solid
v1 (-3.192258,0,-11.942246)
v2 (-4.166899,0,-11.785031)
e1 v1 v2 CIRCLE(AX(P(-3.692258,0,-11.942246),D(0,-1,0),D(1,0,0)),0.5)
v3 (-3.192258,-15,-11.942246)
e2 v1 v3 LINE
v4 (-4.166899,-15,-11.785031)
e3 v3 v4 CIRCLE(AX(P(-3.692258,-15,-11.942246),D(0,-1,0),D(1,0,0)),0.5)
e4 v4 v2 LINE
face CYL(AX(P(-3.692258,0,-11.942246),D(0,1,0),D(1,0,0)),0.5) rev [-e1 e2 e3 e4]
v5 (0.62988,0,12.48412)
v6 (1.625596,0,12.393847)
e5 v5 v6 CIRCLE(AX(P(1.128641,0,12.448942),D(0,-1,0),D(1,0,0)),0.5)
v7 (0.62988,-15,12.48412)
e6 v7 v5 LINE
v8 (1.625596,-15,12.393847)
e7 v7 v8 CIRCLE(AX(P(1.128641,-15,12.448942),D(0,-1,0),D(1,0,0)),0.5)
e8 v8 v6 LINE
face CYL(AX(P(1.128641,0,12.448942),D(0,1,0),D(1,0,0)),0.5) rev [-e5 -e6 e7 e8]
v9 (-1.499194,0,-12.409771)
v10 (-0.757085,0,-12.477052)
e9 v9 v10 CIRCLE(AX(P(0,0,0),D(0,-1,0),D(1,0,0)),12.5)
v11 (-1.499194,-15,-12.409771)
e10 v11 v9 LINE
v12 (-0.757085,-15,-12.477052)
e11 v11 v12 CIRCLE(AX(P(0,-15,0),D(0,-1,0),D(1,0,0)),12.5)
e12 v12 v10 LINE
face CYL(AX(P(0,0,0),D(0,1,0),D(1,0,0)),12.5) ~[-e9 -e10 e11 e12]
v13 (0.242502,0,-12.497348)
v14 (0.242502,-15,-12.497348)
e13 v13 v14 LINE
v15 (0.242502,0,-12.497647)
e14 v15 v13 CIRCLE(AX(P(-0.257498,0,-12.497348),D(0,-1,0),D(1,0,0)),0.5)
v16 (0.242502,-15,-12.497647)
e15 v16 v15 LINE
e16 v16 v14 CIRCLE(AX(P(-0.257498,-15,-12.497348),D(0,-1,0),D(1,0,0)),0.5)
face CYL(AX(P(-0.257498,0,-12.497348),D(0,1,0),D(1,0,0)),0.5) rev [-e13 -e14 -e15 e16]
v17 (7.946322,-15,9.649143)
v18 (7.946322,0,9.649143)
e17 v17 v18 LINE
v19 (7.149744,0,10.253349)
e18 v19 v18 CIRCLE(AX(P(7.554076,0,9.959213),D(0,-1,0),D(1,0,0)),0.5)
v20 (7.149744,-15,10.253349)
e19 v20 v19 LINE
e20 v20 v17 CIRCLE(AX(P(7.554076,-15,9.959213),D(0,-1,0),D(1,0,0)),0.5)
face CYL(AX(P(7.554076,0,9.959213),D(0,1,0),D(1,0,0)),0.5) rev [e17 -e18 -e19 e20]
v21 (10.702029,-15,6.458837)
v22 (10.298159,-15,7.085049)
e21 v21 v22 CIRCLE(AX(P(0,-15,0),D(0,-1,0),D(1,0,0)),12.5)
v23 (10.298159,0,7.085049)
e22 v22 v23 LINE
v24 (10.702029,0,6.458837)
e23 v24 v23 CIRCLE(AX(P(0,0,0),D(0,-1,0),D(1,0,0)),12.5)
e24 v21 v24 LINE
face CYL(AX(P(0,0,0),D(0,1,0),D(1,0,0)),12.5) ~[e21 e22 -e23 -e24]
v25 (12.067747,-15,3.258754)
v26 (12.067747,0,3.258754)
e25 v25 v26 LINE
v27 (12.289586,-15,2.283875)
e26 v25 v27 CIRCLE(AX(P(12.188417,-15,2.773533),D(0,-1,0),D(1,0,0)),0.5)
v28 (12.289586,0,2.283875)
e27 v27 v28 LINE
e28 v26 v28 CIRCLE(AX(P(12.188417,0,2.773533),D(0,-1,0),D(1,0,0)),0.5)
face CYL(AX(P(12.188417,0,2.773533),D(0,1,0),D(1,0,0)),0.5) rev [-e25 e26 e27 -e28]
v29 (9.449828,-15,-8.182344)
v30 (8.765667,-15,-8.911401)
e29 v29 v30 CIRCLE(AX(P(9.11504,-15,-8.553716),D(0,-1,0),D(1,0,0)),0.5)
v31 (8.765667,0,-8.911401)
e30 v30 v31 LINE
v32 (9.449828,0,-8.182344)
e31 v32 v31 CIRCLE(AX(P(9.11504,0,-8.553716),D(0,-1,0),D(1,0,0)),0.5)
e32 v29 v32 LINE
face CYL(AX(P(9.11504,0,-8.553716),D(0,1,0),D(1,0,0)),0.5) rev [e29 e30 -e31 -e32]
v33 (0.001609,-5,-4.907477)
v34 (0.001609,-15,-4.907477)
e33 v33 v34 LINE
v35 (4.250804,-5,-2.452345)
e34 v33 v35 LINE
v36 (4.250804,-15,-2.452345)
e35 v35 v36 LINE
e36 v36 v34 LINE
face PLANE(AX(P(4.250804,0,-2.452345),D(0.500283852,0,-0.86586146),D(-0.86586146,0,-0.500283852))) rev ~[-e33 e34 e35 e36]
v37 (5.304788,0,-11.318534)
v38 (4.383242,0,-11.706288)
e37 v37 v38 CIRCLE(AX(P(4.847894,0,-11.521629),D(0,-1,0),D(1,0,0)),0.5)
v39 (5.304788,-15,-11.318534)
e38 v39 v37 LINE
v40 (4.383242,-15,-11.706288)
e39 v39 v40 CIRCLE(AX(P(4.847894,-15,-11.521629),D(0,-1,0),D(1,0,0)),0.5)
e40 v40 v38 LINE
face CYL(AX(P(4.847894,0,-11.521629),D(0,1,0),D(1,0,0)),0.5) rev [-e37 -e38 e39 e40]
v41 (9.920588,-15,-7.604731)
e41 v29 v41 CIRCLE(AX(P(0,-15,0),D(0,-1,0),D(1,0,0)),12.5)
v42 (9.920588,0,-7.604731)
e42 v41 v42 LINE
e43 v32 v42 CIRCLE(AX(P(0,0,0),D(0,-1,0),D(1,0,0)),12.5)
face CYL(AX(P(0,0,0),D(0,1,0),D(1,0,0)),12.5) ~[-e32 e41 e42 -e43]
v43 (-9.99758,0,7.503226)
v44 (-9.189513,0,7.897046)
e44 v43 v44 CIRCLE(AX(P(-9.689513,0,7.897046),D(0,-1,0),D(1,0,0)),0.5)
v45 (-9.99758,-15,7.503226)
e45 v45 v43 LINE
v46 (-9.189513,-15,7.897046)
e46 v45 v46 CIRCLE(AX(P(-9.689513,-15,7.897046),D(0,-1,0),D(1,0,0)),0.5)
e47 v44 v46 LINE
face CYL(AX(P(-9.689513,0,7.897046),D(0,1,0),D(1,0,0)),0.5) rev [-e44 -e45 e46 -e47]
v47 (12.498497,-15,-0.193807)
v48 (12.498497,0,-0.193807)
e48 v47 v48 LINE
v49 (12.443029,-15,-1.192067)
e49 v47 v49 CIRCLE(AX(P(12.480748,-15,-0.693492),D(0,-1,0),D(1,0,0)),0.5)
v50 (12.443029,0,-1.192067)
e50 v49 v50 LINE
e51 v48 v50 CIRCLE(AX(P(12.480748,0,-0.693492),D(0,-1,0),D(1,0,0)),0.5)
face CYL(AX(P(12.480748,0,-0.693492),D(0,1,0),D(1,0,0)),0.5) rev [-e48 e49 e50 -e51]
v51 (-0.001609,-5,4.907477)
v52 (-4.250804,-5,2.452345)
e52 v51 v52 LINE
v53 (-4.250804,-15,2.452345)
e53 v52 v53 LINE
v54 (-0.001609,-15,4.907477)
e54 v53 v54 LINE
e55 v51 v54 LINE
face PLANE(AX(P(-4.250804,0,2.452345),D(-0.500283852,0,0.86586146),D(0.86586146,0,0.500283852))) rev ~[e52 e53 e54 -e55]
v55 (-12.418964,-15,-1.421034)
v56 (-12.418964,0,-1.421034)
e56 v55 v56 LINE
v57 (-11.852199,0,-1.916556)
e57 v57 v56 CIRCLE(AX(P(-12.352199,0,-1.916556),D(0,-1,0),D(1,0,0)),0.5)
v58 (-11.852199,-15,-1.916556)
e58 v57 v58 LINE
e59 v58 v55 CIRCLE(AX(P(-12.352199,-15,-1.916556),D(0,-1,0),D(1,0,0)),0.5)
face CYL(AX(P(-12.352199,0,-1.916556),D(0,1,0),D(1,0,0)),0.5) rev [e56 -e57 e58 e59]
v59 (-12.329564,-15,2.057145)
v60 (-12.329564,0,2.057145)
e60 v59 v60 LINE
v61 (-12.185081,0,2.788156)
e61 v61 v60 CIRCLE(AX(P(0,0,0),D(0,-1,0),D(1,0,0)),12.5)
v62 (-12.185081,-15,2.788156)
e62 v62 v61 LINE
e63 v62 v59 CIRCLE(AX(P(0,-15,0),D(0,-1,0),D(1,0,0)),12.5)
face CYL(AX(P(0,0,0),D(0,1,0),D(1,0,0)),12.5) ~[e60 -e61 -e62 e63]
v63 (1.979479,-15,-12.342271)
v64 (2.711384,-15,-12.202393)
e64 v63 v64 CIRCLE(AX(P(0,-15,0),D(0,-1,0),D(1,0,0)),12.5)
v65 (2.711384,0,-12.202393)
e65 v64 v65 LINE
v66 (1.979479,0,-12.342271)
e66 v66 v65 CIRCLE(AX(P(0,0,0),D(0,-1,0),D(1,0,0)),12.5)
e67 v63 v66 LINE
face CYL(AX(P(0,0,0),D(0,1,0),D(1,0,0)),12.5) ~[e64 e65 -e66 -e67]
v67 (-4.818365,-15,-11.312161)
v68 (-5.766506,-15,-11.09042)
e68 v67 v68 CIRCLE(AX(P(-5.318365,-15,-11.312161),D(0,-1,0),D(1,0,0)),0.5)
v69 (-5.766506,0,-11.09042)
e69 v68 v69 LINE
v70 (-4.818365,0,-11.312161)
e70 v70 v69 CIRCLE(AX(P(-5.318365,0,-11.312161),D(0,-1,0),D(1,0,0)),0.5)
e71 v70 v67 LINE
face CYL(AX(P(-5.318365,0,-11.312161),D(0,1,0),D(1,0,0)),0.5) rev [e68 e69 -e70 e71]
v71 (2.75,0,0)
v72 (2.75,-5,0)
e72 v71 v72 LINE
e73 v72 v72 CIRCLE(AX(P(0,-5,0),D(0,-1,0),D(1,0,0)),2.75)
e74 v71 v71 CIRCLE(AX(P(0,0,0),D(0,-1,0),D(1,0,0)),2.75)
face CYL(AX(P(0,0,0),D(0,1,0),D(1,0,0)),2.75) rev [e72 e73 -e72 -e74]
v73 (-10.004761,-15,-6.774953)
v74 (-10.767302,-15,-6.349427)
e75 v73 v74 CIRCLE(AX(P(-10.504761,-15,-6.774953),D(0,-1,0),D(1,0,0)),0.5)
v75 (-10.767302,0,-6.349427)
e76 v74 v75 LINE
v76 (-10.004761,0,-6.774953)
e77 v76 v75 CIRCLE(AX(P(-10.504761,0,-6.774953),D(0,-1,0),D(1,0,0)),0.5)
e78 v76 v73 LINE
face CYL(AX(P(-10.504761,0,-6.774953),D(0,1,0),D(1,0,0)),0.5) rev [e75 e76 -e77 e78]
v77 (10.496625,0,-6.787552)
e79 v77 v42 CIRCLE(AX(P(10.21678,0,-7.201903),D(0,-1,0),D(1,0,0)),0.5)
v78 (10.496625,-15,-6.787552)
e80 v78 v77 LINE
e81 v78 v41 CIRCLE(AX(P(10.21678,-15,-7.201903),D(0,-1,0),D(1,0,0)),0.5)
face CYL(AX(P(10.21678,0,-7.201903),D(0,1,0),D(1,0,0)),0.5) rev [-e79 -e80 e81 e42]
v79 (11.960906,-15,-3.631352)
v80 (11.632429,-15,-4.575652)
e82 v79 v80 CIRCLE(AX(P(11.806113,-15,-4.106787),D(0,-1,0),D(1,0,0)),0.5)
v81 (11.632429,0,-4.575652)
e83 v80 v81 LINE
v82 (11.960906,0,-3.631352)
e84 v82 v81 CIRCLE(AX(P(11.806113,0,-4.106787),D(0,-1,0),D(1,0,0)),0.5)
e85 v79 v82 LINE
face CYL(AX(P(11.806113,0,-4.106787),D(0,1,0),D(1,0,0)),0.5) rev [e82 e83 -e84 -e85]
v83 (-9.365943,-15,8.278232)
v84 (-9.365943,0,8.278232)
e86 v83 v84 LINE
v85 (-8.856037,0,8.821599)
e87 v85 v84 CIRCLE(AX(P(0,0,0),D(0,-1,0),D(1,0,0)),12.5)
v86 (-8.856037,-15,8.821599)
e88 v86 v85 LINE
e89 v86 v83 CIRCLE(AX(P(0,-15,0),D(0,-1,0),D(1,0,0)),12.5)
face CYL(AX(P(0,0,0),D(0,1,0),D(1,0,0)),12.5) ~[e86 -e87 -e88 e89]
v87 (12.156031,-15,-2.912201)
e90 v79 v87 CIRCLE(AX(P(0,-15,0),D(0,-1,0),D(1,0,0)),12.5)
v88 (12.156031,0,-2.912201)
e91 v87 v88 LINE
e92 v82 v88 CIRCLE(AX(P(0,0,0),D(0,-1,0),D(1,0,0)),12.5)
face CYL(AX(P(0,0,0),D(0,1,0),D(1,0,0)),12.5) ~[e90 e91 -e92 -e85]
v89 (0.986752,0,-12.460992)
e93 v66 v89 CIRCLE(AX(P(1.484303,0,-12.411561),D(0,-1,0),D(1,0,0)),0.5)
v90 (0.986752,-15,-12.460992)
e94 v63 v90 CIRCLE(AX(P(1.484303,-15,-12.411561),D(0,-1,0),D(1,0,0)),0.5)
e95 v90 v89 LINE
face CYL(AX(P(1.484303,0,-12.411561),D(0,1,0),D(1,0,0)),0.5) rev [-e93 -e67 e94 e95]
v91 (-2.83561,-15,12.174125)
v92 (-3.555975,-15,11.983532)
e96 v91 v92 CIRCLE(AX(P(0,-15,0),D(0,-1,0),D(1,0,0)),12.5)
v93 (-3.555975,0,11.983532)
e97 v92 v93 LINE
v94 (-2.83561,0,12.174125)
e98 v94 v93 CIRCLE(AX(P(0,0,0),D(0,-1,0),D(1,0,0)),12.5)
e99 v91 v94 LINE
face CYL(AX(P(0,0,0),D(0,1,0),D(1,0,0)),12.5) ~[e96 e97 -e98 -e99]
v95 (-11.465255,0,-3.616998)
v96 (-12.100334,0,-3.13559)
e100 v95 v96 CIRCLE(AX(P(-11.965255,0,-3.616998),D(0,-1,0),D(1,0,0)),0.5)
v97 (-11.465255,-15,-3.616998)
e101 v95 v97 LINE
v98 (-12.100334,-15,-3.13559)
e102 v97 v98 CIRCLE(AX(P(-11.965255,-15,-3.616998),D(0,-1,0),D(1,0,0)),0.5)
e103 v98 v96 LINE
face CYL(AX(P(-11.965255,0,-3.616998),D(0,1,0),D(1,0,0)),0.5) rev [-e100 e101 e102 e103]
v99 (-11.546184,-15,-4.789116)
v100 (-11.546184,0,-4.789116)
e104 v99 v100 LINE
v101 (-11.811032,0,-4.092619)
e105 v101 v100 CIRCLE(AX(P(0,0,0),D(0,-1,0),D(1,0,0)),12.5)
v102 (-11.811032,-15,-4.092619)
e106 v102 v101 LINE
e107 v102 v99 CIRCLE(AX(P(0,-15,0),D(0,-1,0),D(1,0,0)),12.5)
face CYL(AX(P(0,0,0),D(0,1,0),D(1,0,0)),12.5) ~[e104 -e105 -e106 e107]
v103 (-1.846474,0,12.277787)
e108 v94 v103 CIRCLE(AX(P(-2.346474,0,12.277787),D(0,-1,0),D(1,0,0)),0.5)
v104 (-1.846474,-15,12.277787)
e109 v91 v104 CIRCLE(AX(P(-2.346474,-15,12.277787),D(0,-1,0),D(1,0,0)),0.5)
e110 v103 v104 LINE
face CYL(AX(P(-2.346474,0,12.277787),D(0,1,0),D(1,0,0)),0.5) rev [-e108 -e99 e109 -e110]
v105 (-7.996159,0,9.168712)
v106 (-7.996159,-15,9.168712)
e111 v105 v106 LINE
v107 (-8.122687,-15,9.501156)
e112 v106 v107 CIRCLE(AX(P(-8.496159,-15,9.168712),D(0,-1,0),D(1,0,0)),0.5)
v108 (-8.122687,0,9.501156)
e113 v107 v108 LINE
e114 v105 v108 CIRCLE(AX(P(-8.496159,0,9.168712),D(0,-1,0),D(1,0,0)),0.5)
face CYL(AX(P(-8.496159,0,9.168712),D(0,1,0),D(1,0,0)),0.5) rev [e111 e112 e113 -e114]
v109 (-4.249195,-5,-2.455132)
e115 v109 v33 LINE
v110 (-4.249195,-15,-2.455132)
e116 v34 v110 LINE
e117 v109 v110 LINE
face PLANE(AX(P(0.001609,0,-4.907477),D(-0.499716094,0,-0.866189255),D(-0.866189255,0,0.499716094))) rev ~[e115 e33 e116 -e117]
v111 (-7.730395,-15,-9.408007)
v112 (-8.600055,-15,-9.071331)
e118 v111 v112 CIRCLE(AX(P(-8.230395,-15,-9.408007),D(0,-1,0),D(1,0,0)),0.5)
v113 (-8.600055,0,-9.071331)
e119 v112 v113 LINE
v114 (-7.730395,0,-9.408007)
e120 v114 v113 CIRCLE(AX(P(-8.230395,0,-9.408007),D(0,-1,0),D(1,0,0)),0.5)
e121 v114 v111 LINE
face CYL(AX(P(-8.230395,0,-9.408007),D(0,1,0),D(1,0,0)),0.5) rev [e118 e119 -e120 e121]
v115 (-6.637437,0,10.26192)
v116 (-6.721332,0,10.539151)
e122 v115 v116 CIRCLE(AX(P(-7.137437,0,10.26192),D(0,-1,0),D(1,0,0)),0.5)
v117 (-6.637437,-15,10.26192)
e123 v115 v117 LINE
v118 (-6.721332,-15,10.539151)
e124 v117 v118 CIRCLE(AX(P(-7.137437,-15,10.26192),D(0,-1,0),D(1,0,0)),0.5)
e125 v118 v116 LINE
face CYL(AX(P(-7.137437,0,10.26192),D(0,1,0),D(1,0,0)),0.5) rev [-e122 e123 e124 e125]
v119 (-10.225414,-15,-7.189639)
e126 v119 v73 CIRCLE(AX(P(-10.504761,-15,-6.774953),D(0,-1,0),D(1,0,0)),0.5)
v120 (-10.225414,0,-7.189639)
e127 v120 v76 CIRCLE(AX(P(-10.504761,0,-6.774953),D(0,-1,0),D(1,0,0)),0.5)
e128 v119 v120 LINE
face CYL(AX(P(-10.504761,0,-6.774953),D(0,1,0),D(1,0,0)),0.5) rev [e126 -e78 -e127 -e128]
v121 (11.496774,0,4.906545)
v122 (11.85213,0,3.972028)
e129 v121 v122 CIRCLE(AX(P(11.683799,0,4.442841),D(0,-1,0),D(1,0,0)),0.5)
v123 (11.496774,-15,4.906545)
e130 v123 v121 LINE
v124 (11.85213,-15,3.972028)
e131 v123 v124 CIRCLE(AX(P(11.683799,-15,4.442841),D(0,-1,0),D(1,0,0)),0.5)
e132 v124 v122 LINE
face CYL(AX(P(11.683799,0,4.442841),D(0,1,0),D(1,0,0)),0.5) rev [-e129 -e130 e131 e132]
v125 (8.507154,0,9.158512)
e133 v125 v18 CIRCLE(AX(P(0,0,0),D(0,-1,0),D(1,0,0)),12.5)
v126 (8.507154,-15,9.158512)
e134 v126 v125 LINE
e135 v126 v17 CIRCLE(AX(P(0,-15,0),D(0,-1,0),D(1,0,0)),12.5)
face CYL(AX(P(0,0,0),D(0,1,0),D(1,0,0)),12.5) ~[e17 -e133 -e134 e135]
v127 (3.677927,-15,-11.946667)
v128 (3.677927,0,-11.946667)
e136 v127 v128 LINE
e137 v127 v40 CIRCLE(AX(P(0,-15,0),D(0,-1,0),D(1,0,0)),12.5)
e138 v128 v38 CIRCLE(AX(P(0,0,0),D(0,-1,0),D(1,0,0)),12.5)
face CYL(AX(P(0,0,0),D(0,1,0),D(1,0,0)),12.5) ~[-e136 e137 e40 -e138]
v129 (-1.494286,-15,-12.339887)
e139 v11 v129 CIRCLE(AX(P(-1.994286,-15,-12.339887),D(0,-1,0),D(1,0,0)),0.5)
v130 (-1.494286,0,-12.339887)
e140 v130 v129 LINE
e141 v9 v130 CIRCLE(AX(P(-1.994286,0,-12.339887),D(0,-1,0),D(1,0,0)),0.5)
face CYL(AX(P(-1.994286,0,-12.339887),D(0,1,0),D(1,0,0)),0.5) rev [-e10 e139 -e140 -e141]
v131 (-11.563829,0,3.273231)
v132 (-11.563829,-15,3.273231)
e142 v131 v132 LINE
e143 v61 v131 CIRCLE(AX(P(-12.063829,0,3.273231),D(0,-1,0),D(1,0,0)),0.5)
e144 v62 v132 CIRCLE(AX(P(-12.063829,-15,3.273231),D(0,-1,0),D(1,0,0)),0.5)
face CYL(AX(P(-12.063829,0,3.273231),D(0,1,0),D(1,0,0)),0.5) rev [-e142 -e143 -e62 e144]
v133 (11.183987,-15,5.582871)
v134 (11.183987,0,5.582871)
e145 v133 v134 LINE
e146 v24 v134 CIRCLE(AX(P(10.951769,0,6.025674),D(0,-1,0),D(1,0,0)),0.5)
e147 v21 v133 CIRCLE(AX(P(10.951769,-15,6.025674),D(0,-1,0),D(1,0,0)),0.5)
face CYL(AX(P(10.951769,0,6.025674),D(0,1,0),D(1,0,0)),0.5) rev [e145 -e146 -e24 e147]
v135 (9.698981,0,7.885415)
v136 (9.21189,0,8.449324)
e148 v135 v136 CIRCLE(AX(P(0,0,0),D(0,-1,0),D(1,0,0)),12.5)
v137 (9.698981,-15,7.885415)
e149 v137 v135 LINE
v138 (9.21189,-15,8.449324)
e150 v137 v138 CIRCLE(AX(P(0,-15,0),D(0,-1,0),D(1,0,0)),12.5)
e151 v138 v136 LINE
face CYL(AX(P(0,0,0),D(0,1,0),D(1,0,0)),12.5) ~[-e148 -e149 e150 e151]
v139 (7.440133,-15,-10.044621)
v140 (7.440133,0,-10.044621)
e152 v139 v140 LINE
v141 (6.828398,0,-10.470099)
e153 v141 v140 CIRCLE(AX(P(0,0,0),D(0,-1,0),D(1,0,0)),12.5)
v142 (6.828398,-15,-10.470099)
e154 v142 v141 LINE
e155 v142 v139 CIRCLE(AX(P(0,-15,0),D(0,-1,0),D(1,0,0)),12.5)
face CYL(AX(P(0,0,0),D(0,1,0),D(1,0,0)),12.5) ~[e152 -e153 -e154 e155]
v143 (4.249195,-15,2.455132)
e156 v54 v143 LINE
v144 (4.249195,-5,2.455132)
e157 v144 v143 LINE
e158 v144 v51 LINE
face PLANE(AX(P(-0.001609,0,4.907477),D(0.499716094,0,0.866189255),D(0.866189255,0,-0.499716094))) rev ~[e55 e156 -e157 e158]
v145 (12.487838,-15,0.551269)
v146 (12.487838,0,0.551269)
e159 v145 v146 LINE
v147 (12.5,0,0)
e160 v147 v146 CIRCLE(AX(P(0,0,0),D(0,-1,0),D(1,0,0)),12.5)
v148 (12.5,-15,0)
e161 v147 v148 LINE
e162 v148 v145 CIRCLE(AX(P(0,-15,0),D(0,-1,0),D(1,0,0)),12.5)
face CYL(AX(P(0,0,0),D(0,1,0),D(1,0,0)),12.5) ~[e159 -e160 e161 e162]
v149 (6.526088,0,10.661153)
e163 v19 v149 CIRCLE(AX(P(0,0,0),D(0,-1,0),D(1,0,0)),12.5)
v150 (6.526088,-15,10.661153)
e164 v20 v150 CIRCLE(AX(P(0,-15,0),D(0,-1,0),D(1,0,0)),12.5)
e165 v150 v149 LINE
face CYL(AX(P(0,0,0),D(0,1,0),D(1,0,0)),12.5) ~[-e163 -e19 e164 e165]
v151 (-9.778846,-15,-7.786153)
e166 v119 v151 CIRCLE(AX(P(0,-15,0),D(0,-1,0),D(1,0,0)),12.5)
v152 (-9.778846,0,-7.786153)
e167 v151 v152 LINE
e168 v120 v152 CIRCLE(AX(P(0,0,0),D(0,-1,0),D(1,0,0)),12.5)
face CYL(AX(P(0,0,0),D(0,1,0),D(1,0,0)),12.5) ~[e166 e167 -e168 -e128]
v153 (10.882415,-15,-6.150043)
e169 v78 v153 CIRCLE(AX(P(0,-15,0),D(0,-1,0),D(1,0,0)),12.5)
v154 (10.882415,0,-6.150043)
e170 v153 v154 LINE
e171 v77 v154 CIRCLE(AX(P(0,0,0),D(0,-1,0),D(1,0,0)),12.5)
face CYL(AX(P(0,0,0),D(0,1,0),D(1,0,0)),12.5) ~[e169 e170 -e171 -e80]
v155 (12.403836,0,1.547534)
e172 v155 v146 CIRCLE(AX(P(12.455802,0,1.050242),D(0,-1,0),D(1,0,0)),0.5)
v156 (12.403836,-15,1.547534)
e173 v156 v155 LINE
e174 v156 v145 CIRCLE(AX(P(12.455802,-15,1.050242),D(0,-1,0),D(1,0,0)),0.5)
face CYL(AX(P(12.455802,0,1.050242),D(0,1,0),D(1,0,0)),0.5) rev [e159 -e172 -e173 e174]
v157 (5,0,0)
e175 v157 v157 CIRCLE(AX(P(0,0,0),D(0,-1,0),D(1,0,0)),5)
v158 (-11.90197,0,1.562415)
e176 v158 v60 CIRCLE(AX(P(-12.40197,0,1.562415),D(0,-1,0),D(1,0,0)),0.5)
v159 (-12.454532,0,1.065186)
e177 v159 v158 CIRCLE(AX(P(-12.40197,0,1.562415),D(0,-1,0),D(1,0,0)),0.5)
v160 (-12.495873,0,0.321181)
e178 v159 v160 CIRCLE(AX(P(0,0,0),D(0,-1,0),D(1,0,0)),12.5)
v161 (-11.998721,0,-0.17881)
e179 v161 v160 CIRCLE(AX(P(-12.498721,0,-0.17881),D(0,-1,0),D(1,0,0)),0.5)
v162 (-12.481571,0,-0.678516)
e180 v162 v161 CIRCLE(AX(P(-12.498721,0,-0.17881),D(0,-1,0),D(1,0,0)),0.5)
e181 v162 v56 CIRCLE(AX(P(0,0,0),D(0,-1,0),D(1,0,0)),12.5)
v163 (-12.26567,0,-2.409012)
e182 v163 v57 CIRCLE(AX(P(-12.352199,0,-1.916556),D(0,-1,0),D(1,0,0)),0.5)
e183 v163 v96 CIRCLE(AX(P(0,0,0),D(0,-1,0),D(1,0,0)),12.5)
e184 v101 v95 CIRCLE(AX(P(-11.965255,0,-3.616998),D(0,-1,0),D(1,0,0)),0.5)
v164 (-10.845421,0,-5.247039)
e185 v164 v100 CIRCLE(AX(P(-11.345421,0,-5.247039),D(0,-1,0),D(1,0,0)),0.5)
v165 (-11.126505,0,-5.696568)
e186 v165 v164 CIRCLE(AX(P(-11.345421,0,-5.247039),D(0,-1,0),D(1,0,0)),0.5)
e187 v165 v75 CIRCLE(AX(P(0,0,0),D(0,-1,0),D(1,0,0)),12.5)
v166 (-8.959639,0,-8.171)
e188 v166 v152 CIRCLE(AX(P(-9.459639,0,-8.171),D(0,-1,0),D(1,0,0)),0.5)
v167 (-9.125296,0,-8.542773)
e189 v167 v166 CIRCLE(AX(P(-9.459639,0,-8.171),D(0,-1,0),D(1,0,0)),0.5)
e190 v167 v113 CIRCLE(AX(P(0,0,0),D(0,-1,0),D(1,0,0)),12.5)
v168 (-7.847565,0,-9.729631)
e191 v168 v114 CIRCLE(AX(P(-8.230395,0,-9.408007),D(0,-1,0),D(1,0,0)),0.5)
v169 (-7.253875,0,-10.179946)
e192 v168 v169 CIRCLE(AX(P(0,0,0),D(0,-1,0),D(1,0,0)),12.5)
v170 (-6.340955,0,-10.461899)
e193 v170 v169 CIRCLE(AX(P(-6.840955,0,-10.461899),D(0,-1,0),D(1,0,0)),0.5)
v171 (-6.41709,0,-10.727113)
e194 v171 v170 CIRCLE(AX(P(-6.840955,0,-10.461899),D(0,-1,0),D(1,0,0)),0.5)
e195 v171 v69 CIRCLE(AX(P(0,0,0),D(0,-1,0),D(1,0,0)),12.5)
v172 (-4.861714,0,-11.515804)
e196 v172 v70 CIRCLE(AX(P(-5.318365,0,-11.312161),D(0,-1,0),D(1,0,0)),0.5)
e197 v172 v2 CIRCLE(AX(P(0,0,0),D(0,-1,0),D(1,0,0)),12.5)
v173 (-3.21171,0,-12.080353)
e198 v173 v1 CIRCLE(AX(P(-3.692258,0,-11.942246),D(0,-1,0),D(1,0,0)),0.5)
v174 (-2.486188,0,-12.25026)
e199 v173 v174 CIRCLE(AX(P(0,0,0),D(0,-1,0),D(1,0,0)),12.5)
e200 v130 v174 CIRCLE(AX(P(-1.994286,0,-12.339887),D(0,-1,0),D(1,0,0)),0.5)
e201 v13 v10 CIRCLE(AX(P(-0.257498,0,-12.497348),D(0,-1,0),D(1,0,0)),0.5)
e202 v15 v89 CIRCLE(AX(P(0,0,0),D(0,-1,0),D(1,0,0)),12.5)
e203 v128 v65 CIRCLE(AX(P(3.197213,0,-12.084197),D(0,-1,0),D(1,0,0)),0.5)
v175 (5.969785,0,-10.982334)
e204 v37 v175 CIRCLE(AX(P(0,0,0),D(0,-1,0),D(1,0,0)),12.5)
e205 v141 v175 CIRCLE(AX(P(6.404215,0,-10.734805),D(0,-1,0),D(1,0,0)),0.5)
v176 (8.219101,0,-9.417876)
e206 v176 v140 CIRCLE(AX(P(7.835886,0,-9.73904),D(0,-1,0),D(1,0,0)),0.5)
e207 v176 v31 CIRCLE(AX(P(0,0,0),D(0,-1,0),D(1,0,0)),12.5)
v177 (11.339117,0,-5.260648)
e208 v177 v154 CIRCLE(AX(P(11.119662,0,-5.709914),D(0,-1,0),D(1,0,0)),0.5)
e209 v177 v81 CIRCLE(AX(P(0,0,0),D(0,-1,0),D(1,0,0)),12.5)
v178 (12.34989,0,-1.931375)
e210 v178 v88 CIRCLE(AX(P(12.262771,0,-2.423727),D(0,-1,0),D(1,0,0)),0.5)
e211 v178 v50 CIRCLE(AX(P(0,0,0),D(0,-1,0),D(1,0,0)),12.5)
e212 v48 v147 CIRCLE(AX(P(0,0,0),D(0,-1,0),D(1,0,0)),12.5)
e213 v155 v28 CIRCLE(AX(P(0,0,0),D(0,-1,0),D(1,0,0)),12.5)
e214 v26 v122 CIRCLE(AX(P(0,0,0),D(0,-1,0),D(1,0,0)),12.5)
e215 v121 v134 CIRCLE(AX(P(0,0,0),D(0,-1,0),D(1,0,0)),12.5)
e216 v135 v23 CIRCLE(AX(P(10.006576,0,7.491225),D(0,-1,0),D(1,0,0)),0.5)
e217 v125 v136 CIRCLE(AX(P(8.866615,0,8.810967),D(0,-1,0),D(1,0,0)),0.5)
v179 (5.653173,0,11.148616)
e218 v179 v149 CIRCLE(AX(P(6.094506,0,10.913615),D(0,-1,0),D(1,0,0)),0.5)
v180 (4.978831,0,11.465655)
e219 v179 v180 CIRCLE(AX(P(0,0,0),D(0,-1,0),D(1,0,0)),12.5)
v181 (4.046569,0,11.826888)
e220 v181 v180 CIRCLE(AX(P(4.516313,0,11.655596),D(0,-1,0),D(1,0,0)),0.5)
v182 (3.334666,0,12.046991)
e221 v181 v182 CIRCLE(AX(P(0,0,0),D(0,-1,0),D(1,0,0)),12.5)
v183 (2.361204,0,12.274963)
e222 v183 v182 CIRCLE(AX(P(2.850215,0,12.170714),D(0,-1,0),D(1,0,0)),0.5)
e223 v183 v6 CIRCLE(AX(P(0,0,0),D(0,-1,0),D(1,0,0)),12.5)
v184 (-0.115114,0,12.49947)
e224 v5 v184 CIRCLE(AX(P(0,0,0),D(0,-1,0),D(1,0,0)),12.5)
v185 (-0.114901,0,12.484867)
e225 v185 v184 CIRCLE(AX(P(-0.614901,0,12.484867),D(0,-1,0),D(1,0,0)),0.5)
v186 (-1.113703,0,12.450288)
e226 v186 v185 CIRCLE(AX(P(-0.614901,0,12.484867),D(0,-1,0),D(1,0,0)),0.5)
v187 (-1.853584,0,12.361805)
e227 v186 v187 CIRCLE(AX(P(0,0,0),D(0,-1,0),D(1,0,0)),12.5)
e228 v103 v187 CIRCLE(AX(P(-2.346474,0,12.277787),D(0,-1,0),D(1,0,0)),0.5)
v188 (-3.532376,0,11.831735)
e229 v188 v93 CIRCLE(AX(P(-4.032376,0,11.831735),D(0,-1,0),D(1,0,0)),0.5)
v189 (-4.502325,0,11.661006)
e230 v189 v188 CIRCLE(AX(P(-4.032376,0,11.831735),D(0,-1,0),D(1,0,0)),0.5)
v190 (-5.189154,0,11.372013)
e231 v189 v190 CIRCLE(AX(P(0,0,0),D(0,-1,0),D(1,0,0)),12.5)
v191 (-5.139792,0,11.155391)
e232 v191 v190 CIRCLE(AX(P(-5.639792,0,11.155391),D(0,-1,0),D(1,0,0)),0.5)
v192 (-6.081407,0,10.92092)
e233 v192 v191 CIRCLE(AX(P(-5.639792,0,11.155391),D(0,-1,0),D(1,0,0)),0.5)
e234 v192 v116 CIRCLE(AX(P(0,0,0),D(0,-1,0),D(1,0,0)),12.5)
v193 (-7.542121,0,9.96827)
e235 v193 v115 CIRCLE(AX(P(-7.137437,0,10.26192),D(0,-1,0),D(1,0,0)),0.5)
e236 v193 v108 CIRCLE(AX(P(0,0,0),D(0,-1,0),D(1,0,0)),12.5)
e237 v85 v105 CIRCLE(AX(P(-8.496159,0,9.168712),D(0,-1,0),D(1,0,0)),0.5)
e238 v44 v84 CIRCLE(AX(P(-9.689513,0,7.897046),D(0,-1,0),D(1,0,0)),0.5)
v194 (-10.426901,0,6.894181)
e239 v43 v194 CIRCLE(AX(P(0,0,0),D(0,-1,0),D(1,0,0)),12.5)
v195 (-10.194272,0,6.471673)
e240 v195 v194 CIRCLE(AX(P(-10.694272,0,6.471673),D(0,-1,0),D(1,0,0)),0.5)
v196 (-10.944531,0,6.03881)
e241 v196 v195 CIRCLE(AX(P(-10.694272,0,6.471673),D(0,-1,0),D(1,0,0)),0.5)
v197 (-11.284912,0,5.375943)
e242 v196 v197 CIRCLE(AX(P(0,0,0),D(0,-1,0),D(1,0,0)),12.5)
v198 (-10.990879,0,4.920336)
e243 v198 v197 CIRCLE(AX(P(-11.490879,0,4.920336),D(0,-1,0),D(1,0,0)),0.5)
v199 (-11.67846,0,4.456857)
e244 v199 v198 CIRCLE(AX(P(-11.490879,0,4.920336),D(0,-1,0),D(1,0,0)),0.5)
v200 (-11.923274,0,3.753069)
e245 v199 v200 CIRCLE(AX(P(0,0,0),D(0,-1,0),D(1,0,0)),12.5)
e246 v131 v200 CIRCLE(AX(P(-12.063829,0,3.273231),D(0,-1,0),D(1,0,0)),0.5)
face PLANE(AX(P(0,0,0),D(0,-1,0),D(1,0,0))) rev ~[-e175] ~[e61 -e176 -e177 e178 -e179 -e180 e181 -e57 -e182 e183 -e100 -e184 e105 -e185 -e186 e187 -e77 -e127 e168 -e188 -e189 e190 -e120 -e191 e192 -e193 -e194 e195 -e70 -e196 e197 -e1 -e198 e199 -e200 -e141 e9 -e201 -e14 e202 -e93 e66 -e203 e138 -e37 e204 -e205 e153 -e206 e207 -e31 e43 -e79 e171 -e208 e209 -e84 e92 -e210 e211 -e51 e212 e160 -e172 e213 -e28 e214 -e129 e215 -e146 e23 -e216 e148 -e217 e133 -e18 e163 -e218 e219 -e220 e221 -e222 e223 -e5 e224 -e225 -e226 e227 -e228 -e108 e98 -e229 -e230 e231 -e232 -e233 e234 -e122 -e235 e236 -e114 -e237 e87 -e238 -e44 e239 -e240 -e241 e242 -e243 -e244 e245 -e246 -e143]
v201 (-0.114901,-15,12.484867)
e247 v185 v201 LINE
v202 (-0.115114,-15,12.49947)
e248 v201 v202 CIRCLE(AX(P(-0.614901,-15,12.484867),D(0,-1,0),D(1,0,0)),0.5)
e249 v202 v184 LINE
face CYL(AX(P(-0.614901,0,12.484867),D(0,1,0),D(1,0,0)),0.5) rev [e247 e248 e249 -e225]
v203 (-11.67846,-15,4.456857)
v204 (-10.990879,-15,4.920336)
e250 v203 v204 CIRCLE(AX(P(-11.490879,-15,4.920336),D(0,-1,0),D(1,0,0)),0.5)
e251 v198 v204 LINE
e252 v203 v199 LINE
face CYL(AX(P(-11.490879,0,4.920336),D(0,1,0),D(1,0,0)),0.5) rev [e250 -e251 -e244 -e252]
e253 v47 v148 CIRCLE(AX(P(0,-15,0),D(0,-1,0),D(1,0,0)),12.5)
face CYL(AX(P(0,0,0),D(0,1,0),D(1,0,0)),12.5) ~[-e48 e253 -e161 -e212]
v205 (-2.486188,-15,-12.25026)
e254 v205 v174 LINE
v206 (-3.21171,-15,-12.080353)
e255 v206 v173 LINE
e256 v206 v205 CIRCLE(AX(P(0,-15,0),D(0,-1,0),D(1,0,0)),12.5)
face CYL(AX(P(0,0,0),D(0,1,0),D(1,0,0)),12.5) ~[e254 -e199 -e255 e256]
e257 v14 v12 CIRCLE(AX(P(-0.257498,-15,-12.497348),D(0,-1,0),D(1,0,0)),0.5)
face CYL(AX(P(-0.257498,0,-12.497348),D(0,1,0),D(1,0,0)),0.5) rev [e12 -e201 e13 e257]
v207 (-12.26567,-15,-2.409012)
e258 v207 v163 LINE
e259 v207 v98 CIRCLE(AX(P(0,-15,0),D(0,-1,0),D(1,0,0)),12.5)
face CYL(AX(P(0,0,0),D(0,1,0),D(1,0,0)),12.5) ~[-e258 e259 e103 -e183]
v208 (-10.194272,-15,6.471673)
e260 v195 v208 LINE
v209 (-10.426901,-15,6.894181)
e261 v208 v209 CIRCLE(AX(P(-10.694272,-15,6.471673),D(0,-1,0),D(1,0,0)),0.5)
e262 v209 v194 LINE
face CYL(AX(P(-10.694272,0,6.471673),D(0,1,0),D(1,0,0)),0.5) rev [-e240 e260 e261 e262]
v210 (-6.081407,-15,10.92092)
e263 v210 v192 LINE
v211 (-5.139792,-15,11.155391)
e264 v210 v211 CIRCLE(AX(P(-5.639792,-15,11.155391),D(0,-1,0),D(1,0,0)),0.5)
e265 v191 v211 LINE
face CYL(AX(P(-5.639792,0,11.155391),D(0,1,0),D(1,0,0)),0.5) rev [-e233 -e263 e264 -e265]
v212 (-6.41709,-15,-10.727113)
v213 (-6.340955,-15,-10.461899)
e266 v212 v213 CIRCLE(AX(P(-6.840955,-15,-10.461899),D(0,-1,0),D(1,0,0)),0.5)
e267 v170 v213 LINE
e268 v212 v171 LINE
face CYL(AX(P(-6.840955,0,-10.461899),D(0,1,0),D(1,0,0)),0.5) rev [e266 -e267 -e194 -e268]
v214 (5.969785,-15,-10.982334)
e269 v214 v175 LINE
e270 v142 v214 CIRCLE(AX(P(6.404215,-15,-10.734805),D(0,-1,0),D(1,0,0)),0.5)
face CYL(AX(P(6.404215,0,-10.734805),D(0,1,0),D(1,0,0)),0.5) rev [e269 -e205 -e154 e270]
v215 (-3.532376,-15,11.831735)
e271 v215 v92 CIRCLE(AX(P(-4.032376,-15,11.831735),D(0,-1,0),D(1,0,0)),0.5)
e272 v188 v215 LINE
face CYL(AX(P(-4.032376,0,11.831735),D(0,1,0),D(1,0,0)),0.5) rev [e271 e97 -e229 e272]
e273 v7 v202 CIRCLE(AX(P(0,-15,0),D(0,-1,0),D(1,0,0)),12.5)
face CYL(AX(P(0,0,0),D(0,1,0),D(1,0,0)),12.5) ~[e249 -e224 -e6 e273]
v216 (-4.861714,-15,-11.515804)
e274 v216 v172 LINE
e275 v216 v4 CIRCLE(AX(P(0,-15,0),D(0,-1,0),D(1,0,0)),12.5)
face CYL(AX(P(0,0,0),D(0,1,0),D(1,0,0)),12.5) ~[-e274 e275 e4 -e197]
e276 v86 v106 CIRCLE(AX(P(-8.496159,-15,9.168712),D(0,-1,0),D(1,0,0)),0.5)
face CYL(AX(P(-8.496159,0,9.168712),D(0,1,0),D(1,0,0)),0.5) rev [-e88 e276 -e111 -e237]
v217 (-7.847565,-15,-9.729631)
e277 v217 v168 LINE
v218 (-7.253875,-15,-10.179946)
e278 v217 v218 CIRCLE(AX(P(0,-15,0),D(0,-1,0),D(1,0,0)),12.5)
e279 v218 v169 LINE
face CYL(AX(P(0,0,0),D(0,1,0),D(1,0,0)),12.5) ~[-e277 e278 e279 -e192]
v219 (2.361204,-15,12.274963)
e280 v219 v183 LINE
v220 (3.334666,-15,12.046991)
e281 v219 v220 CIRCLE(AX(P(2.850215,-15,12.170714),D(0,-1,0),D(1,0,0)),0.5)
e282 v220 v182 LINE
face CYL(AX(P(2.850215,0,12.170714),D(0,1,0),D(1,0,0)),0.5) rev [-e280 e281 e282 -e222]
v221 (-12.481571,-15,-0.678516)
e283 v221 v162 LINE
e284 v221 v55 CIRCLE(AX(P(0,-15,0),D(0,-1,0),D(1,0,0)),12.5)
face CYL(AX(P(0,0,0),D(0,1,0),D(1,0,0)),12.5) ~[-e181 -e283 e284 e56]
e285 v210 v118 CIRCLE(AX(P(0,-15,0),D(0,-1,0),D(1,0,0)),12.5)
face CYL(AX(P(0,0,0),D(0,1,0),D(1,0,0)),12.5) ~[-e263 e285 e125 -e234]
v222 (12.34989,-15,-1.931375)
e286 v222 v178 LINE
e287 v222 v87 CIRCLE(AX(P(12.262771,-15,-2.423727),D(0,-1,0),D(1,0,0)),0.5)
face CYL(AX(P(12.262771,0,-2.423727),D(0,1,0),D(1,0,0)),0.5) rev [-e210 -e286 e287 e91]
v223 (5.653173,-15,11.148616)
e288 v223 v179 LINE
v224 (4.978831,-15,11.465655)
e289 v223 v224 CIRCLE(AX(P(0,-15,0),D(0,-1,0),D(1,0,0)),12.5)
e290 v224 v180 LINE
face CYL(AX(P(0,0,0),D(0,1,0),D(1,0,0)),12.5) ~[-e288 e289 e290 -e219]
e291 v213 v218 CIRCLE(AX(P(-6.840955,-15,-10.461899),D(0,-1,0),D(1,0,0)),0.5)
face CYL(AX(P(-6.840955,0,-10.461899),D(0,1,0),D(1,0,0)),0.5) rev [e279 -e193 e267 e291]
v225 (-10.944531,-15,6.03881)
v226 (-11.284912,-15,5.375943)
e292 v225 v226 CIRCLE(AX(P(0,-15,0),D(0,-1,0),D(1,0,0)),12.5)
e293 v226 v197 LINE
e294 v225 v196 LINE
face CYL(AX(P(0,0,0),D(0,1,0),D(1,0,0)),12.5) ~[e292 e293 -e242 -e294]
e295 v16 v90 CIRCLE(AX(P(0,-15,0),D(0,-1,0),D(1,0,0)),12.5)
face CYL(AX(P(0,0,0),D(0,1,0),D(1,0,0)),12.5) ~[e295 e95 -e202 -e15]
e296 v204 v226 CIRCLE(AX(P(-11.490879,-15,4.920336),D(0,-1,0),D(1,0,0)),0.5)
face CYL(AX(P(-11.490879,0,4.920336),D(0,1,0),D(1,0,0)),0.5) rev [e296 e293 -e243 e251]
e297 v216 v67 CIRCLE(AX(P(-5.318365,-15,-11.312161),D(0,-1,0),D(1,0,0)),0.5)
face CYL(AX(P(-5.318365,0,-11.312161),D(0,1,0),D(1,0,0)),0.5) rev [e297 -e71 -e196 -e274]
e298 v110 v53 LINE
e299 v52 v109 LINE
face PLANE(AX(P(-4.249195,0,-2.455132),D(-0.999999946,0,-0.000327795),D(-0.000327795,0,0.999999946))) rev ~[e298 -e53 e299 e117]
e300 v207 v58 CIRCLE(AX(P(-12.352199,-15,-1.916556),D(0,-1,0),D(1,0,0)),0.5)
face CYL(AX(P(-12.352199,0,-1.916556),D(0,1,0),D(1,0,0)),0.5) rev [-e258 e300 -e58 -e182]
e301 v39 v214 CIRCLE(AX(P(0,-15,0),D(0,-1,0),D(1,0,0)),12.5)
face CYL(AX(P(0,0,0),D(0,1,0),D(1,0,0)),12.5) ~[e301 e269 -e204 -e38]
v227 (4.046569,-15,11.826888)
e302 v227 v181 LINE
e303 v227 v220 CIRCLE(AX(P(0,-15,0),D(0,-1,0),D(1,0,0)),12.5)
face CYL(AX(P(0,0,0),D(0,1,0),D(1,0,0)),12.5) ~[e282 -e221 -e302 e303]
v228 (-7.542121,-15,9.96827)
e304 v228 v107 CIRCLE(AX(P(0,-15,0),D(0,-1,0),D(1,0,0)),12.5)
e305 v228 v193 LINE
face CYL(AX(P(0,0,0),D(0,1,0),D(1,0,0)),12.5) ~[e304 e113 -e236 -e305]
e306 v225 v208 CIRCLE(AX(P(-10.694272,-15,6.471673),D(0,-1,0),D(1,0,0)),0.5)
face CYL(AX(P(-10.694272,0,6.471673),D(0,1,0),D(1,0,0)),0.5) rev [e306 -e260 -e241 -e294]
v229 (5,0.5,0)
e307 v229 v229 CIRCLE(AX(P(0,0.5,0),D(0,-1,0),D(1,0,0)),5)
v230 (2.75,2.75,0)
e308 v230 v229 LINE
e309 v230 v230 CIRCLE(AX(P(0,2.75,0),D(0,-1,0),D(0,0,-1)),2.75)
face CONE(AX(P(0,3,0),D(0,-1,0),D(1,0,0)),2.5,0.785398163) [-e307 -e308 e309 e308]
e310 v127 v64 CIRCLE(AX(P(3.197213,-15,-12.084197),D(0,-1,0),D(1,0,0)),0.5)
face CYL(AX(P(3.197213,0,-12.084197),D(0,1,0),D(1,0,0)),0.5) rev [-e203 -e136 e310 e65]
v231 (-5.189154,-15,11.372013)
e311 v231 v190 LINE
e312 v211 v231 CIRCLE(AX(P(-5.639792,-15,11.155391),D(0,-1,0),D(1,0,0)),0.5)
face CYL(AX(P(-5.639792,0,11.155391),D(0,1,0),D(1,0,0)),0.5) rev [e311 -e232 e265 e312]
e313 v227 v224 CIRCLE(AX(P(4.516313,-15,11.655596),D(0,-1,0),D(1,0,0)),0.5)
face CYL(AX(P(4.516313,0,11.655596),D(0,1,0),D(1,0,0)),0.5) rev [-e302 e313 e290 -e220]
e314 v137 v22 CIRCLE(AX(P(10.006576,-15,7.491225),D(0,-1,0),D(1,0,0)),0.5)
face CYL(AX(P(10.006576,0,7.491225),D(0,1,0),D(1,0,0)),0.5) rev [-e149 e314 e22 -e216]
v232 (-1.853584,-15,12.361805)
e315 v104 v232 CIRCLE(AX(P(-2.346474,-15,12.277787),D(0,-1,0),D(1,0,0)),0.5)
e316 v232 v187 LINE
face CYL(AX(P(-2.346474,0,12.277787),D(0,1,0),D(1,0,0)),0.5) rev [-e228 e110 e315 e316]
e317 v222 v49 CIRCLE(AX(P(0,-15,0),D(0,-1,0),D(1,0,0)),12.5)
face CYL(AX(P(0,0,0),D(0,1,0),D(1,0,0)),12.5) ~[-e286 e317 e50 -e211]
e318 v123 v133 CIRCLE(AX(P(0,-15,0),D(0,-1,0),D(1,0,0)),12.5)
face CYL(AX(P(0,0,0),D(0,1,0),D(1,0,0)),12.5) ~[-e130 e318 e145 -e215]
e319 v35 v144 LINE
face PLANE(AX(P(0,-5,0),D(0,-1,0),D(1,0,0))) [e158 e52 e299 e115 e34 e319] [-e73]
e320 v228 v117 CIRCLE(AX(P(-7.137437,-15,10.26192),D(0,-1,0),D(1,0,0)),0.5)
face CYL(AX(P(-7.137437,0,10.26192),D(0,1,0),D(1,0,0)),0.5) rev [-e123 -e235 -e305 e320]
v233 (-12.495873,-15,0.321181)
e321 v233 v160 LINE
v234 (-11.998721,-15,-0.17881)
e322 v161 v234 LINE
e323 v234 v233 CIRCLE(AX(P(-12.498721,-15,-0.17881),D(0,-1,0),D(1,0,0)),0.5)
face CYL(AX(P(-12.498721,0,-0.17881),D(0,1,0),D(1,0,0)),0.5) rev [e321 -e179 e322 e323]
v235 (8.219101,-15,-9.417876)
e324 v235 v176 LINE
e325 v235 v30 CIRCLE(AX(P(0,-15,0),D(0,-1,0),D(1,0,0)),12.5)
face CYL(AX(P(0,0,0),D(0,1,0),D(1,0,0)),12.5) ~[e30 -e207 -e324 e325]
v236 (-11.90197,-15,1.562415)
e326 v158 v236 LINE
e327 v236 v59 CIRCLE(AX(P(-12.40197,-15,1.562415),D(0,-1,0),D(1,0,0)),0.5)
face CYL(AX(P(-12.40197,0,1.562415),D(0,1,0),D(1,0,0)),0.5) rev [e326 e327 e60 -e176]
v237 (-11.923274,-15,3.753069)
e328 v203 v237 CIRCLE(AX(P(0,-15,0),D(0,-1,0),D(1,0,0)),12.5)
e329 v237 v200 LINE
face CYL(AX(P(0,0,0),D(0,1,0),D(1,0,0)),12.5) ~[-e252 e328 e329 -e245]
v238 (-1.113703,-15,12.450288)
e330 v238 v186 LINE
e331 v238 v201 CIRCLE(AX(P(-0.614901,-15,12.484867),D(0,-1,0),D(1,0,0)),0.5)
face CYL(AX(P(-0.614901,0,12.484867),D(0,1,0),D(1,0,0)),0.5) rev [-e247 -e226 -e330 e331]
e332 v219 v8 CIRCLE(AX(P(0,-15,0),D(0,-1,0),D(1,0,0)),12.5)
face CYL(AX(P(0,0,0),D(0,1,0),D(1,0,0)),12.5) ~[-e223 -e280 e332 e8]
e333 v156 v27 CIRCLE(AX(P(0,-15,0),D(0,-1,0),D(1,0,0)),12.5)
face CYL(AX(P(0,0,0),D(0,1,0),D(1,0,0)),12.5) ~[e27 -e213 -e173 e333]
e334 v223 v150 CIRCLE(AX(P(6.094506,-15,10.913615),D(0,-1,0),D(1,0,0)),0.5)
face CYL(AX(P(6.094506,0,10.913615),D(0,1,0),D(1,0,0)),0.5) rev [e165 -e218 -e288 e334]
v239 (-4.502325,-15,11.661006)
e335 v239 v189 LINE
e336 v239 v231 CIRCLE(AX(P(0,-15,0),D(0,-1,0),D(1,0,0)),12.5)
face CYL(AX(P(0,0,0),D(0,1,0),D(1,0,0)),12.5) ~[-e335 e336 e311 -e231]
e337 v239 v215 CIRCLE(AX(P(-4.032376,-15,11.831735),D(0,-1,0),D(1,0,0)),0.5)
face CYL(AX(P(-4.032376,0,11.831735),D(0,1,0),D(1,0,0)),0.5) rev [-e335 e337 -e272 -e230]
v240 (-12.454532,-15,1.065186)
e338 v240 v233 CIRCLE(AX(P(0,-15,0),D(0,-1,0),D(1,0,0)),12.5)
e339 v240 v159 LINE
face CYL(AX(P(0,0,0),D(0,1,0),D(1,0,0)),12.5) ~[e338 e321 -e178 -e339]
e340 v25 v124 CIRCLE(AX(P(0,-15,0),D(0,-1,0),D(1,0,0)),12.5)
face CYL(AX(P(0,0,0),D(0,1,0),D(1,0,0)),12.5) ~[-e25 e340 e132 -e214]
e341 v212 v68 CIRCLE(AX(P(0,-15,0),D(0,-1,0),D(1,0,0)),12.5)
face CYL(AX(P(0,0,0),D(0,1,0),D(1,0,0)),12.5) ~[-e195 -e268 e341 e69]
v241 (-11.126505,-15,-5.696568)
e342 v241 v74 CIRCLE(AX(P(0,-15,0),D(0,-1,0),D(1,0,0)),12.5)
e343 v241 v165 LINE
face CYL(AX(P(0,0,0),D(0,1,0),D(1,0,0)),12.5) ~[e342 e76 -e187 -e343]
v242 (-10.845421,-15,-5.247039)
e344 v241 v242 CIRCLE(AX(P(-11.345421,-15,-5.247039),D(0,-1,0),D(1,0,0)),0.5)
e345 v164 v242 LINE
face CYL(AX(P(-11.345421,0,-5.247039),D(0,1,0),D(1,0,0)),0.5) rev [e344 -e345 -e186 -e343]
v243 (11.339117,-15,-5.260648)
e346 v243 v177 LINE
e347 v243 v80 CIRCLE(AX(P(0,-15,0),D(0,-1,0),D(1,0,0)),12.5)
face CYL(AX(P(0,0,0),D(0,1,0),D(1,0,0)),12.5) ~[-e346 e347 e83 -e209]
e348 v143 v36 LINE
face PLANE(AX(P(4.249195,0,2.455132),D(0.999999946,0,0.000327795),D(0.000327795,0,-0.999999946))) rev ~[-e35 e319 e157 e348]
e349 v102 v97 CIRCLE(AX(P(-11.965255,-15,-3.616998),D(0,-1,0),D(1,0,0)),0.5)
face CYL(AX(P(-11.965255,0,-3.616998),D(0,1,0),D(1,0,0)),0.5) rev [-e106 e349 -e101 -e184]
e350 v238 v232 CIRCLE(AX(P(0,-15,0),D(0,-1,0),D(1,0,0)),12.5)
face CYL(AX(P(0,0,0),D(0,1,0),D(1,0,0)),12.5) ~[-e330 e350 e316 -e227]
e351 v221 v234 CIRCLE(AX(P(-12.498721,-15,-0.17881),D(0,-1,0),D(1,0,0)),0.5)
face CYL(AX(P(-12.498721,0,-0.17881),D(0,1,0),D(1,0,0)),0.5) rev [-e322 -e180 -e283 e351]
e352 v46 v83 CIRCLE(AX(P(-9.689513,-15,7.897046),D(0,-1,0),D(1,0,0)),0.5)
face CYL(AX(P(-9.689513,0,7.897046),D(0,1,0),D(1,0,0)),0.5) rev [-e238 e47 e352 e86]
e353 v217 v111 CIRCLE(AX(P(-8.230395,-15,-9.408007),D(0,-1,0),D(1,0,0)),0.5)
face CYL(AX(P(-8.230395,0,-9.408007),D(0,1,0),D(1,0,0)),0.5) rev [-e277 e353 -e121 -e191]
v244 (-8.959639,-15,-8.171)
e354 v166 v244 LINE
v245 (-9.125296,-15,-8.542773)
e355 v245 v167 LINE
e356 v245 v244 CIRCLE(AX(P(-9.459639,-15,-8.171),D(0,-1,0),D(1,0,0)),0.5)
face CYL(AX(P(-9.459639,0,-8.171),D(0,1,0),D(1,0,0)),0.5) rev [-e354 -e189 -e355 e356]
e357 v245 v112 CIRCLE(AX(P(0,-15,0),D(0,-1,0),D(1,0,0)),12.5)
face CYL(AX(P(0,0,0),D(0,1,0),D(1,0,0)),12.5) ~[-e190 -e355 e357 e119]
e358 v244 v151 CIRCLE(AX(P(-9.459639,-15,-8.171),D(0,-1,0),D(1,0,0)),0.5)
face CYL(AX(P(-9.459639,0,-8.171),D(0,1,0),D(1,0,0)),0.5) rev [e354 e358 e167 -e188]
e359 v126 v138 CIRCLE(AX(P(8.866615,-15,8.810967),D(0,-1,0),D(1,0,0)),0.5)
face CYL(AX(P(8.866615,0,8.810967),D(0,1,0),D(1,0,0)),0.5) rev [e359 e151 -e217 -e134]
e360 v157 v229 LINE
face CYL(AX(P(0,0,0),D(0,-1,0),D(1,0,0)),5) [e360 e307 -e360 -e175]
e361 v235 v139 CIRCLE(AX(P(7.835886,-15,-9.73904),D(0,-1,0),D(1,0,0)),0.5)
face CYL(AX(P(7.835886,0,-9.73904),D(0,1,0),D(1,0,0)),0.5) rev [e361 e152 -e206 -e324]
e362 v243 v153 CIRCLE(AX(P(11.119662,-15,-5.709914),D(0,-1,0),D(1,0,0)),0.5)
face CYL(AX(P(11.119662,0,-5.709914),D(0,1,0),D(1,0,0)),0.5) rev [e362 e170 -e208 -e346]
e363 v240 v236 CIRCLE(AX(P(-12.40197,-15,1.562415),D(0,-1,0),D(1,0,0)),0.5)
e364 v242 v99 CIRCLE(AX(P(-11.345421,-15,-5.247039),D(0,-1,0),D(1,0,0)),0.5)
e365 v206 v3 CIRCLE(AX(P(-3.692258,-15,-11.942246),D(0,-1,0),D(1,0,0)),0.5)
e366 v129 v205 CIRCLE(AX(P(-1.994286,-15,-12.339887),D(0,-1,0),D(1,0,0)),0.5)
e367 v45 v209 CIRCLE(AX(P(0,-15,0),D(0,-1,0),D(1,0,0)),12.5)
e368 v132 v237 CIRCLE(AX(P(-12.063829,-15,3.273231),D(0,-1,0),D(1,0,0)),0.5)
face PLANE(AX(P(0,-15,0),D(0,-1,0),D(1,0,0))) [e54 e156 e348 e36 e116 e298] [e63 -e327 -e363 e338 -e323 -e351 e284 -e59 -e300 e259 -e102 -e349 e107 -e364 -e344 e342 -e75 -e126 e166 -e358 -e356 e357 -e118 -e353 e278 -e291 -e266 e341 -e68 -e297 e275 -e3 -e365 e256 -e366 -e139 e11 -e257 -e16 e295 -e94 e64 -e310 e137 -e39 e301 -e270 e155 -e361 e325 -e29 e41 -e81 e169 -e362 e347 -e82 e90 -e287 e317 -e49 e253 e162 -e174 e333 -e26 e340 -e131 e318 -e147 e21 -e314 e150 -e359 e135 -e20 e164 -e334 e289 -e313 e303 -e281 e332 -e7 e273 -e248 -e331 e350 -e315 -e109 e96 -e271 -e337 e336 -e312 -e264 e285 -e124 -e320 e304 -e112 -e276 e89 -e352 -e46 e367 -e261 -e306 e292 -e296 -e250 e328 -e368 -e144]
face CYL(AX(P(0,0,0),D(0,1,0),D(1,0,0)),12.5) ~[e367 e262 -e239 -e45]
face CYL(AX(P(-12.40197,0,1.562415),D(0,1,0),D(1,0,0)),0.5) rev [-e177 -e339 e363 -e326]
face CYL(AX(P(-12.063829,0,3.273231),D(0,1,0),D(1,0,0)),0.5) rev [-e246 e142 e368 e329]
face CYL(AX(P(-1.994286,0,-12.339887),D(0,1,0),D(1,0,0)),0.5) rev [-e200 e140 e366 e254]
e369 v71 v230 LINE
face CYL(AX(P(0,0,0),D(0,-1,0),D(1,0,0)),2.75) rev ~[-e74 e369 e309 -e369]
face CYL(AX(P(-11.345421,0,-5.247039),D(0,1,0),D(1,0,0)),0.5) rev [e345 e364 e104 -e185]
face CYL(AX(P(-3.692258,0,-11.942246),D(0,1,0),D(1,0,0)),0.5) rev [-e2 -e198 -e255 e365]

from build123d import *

# Parameters (mm, degrees)
F0_R     = 12.5
F0_R_2   = 5
F1_DEPTH = 15
F2_DEPTH = 15
F0_R_3   = 2.75
F3_DEPTH = 5
F4_DEPTH = 3
F5_DEPTH = 3
F7_R     = 0.5
F8_DEPTH = 15


# Not quite as in the source:
# - a fillet or chamfer that OpenCascade refuses, or shapes differently, is made with other operations: its cross-section is extruded or revolved along the edge and cut away or added


with BuildPart() as f1:
    # F0 (on Front) → F1 (new body)
    with BuildSketch(Plane.XZ):
        Circle(F0_R)
        Circle(F0_R_2, mode=Mode.SUBTRACT)
    extrude(amount=F1_DEPTH)

    # F0 (on Front) → F2 (join)
    with BuildSketch(Plane.XZ):
        Circle(F0_R_2)
        Polygon((-4.2491954474, -2.4551316428), (-4.250804096, 2.4523453817), (-0.0016086486, 4.9074770245), (4.2491954474, 2.4551316428), (4.250804096, -2.4523453817), (0.0016086486, -4.9074770245), align=None, mode=Mode.SUBTRACT)
    extrude(amount=F2_DEPTH)

    # F0 (on Front) → F3 (join)
    with BuildSketch(Plane.XZ):
        Polygon((-0.0016086486, 4.9074770245), (-4.250804096, 2.4523453817), (-4.2491954474, -2.4551316428), (0.0016086486, -4.9074770245), (4.250804096, -2.4523453817), (4.2491954474, 2.4551316428), align=None)
        Circle(F0_R_3, mode=Mode.SUBTRACT)
    extrude(amount=F3_DEPTH)

    # F0 (on Front) → F4 (join)
    with BuildSketch(Plane.XZ):
        Circle(F0_R_2)
        Polygon((-4.2491954474, -2.4551316428), (-4.250804096, 2.4523453817), (-0.0016086486, 4.9074770245), (4.2491954474, 2.4551316428), (4.250804096, -2.4523453817), (0.0016086486, -4.9074770245), align=None, mode=Mode.SUBTRACT)
    extrude(amount=-F4_DEPTH)

    # F0 (on Front) → F5 (join)
    with BuildSketch(Plane.XZ):
        Polygon((-0.0016086486, 4.9074770245), (-4.250804096, 2.4523453817), (-4.2491954474, -2.4551316428), (0.0016086486, -4.9074770245), (4.250804096, -2.4523453817), (4.2491954474, 2.4551316428), align=None)
        Circle(F0_R_3, mode=Mode.SUBTRACT)
    extrude(amount=-F5_DEPTH)

    # F6: chamfer of 2.5 on 1 edges, made by hand

    # F6_s1 → F6_t2 (revolve, cut)
    with BuildSketch(Plane.XY):
        Polygon((2.5, 3), (5, 0.5), (5, 3), align=None)
    revolve(axis=Axis((0, 3, 0), (0, -1, 0)), mode=Mode.SUBTRACT)

    # F7 (on Front) → F8 (cut)
    with BuildSketch(Plane.XZ):
        with Locations((-5.3183648548, -11.3121613881)):
            Circle(F7_R)
        with Locations((-3.6922583147, -11.94224554)):
            Circle(F7_R)
        with Locations((-1.9942861663, -12.3398874665)):
            Circle(F7_R)
        with Locations((-0.2574975062, -12.4973475199)):
            Circle(F7_R)
        with Locations((1.4843030499, -12.4115609194)):
            Circle(F7_R)
        with Locations((3.1972133356, -12.0841974035)):
            Circle(F7_R)
        with Locations((4.8478935004, -11.5216287307)):
            Circle(F7_R)
        with Locations((6.4042149327, -10.7348046603)):
            Circle(F7_R)
        with Locations((7.835885606, -9.7390398279)):
            Circle(F7_R)
        with Locations((9.1150396792, -8.5537156632)):
            Circle(F7_R)
        with Locations((10.2167798732, -7.2019031529)):
            Circle(F7_R)
        with Locations((11.1196620684, -5.7099137897)):
            Circle(F7_R)
        with Locations((11.8061126898, -4.1067874495)):
            Circle(F7_R)
        with Locations((12.262770757, -2.423727163)):
            Circle(F7_R)
        with Locations((12.4807479401, -0.6934917843)):
            Circle(F7_R)
        with Locations((12.4558015612, 1.0502416232)):
            Circle(F7_R)
        with Locations((12.1884171732, 2.7735332722)):
            Circle(F7_R)
        with Locations((11.683799109, 4.4428412508)):
            Circle(F7_R)
        with Locations((10.9517691853, 6.0256743782)):
            Circle(F7_R)
        with Locations((10.0065755319, 7.4912246078)):
            Circle(F7_R)
        with Locations((8.866615268, 8.8109666717)):
            Circle(F7_R)
        with Locations((7.5540764236, 9.9592132916)):
            Circle(F7_R)
        with Locations((6.0945060742, 10.9136151532)):
            Circle(F7_R)
        with Locations((4.5163130964, 11.6555959099)):
            Circle(F7_R)
        with Locations((2.8502152215, 12.1707137503)):
            Circle(F7_R)
        with Locations((1.1286411494, 12.4489424915)):
            Circle(F7_R)
        with Locations((-0.6149006389, 12.4848667275)):
            Circle(F7_R)
        with Locations((-2.3464740857, 12.2777872341)):
            Circle(F7_R)
        with Locations((-4.0323760835, 11.8317345779)):
            Circle(F7_R)
        with Locations((-5.6397924676, 11.1553906665)):
            Circle(F7_R)
        with Locations((-7.1374367064, 10.2619197649)):
            Circle(F7_R)
        with Locations((-8.4961588585, 9.1687122678)):
            Circle(F7_R)
        with Locations((-9.6895129427, 7.8970462157)):
            Circle(F7_R)
        with Locations((-10.6942716791, 6.4716731418)):
            Circle(F7_R)
        with Locations((-11.4908785818, 4.9203363116)):
            Circle(F7_R)
        with Locations((-12.0638286036, 3.2732307318)):
            Circle(F7_R)
        with Locations((-12.401969924, 1.5624154391)):
            Circle(F7_R)
        with Locations((-12.4987210069, -0.1788104928)):
            Circle(F7_R)
        with Locations((-12.3521987024, -1.916556082)):
            Circle(F7_R)
        with Locations((-11.9652549007, -3.616998087)):
            Circle(F7_R)
        with Locations((-11.3454210226, -5.2470393386)):
            Circle(F7_R)
        with Locations((-10.5047614295, -6.7749529378)):
            Circle(F7_R)
        with Locations((-9.4596386041, -8.1709997846)):
            Circle(F7_R)
        with Locations((-8.2303946735, -9.4080074148)):
            Circle(F7_R)
        with Locations((-6.8409554726, -10.4618988822)):
            Circle(F7_R)
    extrude(amount=F8_DEPTH, mode=Mode.SUBTRACT)


solid = f1.part
